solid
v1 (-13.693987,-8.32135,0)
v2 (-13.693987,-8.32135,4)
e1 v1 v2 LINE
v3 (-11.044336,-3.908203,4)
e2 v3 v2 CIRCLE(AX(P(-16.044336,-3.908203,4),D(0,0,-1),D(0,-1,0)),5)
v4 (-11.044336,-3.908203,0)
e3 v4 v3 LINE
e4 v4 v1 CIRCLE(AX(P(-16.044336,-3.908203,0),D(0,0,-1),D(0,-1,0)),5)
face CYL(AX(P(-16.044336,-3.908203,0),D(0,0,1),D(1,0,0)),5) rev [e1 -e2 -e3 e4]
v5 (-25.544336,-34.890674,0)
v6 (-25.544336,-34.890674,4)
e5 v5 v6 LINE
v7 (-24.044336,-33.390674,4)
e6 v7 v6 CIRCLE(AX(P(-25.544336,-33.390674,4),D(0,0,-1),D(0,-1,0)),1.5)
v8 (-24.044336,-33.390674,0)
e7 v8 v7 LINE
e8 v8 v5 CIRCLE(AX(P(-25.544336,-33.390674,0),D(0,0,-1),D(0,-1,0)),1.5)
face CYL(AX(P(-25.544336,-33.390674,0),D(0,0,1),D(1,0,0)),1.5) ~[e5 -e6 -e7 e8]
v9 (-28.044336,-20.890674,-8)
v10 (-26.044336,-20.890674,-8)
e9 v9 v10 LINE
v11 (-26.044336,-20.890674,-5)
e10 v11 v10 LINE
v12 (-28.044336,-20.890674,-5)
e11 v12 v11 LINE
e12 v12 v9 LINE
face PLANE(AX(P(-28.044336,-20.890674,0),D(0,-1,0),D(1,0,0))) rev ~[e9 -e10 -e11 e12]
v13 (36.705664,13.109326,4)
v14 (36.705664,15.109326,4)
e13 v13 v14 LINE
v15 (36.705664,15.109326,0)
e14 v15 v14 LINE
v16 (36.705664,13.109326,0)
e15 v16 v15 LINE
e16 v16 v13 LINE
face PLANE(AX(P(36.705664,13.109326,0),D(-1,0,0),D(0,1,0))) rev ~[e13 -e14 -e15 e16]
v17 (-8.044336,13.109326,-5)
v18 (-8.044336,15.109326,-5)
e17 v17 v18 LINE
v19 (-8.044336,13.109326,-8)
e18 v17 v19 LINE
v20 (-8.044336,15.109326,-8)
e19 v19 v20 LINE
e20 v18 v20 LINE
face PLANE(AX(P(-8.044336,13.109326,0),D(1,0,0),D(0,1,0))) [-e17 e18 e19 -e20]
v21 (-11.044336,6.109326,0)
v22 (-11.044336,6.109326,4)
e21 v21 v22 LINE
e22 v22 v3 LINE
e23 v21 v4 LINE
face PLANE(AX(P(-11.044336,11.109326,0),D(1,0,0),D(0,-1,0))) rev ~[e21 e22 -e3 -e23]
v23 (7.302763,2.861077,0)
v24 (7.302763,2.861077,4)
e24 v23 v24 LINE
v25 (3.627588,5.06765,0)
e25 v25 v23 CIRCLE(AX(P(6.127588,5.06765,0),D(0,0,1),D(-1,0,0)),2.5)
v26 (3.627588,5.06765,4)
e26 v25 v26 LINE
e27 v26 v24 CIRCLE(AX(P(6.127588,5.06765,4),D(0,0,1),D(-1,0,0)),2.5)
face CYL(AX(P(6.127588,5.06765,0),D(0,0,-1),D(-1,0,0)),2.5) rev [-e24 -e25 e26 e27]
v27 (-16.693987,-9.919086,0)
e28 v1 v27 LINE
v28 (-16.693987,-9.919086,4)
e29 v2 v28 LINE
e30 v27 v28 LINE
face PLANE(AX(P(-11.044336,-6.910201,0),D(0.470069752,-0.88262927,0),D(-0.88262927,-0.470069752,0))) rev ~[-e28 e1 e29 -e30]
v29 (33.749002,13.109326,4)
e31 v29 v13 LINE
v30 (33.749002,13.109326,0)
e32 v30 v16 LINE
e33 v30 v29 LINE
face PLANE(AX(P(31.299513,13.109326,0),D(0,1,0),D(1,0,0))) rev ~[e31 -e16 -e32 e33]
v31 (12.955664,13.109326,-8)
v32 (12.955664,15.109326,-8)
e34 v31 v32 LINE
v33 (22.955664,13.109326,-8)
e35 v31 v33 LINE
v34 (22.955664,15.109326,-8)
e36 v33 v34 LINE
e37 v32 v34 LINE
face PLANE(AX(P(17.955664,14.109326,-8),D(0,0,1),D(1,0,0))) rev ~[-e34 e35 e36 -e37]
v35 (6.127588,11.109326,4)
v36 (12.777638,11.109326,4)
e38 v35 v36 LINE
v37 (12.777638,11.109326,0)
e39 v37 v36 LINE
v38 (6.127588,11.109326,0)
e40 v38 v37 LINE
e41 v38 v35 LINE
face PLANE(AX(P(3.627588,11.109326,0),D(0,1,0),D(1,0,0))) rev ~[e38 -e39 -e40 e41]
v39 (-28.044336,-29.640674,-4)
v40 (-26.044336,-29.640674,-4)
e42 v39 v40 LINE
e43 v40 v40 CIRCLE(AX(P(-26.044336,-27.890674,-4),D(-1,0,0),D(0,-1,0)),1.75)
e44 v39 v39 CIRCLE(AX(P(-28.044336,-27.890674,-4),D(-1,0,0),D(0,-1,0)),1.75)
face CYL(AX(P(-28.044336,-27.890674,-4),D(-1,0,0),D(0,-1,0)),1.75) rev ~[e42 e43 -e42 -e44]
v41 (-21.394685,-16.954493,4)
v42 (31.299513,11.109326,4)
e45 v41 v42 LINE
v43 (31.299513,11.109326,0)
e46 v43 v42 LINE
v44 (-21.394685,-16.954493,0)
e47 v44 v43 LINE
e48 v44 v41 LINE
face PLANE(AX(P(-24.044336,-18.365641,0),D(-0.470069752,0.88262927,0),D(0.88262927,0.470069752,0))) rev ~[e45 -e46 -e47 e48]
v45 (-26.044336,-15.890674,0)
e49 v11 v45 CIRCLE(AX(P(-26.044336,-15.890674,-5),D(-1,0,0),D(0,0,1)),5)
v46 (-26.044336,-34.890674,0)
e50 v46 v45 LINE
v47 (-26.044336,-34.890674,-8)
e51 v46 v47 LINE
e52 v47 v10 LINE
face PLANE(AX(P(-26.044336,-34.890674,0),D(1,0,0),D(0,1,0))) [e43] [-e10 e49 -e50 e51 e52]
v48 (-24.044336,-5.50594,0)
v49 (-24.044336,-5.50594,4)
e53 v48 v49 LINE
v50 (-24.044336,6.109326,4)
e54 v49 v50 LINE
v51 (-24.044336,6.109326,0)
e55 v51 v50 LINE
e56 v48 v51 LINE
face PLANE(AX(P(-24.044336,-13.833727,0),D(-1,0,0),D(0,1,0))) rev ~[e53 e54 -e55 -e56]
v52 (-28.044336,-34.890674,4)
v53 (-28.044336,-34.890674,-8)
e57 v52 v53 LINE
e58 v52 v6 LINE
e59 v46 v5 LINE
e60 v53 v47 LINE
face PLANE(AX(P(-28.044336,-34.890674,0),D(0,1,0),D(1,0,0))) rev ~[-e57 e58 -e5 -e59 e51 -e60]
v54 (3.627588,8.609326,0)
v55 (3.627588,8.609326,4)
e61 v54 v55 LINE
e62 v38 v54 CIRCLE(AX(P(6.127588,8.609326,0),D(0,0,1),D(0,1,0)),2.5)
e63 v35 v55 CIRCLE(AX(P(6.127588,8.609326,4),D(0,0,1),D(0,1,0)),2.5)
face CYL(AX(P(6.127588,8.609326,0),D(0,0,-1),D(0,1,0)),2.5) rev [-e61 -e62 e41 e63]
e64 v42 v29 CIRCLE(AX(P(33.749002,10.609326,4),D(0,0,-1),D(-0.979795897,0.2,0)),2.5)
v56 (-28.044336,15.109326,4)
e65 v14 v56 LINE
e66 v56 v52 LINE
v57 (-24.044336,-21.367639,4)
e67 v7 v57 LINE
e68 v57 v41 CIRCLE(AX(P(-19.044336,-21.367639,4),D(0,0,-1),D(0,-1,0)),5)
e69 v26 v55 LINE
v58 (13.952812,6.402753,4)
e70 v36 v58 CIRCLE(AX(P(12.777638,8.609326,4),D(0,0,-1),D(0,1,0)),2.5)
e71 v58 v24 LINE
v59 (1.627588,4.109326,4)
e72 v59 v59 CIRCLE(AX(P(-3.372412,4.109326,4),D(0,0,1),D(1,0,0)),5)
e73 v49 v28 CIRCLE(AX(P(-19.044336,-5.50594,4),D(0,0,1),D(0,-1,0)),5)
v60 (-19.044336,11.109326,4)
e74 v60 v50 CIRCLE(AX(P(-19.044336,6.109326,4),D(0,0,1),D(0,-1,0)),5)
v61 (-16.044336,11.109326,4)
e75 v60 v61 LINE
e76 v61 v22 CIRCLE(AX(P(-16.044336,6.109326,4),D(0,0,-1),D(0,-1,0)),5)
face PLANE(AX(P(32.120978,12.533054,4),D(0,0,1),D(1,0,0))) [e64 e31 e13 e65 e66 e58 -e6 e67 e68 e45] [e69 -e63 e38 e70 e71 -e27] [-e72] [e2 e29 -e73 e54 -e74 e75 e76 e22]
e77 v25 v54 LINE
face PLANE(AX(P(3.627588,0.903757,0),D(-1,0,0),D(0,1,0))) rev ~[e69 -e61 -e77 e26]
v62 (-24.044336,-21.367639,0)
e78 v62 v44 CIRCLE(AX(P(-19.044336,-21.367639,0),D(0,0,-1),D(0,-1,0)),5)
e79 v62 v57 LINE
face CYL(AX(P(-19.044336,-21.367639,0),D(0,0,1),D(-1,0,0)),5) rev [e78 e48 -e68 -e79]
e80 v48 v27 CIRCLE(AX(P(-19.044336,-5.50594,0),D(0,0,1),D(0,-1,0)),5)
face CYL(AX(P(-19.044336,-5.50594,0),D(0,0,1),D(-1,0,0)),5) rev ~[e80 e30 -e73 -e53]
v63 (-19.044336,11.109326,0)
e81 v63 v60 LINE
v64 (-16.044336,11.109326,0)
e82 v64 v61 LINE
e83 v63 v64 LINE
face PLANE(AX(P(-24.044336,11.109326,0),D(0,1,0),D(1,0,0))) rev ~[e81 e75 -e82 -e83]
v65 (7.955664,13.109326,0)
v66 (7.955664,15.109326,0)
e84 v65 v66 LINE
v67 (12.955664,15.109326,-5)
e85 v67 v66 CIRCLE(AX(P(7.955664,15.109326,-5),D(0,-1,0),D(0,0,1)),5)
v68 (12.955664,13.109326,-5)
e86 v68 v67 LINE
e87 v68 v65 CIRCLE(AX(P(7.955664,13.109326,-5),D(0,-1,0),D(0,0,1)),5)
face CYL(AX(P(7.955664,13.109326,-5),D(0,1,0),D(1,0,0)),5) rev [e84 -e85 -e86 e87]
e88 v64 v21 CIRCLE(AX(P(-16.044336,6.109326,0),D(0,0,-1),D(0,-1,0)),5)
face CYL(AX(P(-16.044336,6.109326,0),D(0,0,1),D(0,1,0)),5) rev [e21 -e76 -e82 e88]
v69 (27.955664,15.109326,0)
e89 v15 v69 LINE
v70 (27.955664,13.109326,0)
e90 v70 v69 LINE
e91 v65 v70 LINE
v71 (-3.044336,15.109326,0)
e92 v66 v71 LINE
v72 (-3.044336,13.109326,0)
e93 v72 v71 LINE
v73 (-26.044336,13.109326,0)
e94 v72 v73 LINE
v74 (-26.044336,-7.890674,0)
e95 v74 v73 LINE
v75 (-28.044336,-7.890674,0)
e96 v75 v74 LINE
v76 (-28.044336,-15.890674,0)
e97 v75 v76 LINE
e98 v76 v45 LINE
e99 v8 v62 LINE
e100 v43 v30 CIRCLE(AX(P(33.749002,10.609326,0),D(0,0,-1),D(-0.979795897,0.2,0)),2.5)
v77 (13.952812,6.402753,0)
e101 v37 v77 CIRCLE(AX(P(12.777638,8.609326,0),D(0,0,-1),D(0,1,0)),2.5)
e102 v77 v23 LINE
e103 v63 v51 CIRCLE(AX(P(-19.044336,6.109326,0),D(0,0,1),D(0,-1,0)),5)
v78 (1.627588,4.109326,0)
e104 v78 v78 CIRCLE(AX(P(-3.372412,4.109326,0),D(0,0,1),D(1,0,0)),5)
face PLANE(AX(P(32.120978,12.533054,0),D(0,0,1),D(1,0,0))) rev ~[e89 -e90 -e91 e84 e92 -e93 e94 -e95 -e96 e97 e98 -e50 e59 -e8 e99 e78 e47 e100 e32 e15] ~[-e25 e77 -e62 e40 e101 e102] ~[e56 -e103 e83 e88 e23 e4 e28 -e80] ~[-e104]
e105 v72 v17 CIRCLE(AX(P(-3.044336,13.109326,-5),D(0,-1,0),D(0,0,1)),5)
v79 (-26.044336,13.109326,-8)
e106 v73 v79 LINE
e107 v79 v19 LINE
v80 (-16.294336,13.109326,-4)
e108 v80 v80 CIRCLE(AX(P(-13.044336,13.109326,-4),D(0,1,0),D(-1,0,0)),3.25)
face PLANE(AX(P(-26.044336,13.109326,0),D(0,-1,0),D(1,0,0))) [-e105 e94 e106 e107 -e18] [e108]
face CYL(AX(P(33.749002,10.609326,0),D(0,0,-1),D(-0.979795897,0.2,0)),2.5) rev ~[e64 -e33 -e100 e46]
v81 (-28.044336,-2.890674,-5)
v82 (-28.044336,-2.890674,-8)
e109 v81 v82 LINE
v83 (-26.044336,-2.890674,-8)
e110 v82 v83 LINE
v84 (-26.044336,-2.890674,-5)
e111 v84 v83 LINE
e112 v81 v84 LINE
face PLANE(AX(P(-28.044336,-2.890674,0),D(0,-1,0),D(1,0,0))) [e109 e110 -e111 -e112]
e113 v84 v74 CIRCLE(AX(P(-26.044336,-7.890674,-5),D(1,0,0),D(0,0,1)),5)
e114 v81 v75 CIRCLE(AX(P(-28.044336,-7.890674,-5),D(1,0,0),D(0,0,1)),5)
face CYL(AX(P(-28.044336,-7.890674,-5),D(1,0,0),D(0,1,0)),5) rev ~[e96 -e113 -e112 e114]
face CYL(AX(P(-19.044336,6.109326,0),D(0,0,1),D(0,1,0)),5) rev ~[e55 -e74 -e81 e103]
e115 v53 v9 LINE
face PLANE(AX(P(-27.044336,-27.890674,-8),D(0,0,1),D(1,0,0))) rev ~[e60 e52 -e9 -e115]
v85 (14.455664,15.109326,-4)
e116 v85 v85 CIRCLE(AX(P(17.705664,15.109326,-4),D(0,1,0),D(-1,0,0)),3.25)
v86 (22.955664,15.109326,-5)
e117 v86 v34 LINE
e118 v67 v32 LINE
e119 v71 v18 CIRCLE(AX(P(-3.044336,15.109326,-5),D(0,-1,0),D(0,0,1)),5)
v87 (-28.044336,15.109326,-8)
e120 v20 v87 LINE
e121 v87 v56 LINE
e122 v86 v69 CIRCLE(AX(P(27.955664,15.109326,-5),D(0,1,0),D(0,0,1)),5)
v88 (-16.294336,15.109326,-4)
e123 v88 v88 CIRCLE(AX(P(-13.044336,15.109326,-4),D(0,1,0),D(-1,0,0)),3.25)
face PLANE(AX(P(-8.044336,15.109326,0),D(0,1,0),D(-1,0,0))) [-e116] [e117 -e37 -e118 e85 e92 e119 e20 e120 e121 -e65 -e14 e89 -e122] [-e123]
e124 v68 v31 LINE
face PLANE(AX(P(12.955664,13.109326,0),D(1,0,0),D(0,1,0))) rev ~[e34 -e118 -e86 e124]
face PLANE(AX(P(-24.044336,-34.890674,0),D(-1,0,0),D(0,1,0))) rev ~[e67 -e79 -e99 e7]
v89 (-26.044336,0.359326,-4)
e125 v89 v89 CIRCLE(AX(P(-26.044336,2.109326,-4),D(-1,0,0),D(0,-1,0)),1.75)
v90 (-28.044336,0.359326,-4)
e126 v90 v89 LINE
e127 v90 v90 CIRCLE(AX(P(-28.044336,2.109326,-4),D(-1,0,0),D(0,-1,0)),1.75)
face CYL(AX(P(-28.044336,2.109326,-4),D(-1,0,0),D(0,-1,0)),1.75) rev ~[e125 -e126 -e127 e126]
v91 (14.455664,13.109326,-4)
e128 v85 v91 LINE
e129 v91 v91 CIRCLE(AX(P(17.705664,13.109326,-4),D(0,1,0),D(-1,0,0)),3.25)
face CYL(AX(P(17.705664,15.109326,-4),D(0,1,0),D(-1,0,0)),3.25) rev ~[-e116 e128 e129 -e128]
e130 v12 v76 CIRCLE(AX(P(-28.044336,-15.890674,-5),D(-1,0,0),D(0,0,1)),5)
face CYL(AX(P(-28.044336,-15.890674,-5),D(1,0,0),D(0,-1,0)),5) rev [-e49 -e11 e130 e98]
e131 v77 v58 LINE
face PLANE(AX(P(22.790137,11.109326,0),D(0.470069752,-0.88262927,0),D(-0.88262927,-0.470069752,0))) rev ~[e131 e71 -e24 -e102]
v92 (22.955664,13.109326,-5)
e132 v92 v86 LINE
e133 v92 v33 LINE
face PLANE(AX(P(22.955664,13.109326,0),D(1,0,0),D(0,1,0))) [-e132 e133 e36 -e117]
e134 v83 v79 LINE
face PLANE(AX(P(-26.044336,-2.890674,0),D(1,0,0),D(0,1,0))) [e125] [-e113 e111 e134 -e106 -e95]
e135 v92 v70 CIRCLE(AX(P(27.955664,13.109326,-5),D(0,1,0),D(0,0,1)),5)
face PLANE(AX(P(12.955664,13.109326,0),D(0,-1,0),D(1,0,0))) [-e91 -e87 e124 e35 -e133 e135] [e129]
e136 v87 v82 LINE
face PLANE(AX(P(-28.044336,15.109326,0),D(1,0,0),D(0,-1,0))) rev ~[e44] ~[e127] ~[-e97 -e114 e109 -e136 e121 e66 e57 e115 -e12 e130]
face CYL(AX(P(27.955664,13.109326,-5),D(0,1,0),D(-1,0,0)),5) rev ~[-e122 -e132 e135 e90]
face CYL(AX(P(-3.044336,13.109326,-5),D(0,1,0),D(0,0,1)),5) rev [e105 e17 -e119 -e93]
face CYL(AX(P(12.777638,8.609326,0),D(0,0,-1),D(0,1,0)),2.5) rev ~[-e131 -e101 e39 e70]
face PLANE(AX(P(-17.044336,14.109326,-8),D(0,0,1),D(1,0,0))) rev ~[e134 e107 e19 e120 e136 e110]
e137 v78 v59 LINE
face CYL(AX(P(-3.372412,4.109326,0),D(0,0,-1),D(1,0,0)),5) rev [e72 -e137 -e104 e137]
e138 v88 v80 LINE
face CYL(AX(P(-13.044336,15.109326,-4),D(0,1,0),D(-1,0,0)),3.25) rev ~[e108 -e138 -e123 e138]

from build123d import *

# Parameters (mm, degrees)
F0_R        = 5
F1_DEPTH    = 4
F2_W        = 10
F2_H        = 2
F2_W_2      = 18
F2_W_3      = 2
F2_H_2      = 14
F3_DEPTH    = 8
F4_R        = 5
F5_T1_DEPTH = 4
F6_R        = 1.5
F8_R        = 3.25
F9_DEPTH    = 2
F7_R        = 1.75
F10_DEPTH   = 2


# Not quite as in the source:
# - a fillet or chamfer that OpenCascade refuses, or shapes differently, is made with other operations: its cross-section is extruded or revolved along the edge and cut away or added


with BuildPart() as f1:
    # F0 (on Top) → F1 (new body)
    with BuildSketch(Plane.XY):
        Polygon((-24.0443362383, -18.3656413368), (31.299512524, 11.1093264446), (31.299512524, 13.1093264446), (36.7056637617, 13.1093264446), (36.7056637617, 15.1093264446), (-28.0443362383, 15.1093264446), (-28.0443362383, -34.8906735554), (-24.0443362383, -34.8906735554), align=None)
        Polygon((-24.0443362383, -13.8337272738), (-24.0443362383, 11.1093264446), (-11.0443362383, 11.1093264446), (3.6275881428, 11.1093264446), (22.7901370984, 11.1093264446), (3.6275881428, 0.9037566169), (-11.0443362383, -6.9102011778), align=None, mode=Mode.SUBTRACT)
        Polygon((3.6275881428, 11.1093264446), (-11.0443362383, 11.1093264446), (-11.0443362383, -6.9102011778), (3.6275881428, 0.9037566169), align=None)
        with Locations((-3.3724118572, 4.1093264446)):
            Circle(F0_R, mode=Mode.SUBTRACT)
    extrude(amount=F1_DEPTH)

    # F2 (on Top) → F3 (join)
    with BuildSketch(Plane.XY):
        with Locations((17.9556637617, 14.1093264446)):
            Rectangle(F2_W, F2_H)
        with Locations((-17.0443362383, 14.1093264446)):
            Rectangle(F2_W_2, F2_H)
        Polygon((-26.0443362383, 15.1093264446), (-28.0443362383, 15.1093264446), (-28.0443362383, -2.8906735554), (-26.0443362383, -2.8906735554), (-26.0443362383, 13.1093264446), align=None)
        with Locations((-27.0443362383, -27.8906735554)):
            Rectangle(F2_W_3, F2_H_2)
    extrude(amount=-F3_DEPTH)

    # F4
    f4_edges = [f1.edges().sort_by_distance(p)[0] for p in [
        (-24.044336, -18.365641, 2),
        (-24.044336, 11.109326, 2),
        (-8.044336, 14.109326, 0),
        (22.955664, 14.109326, 0),
        (-27.044336, -2.890674, 0),
        (12.955664, 14.109326, 0),
        (-27.044336, -20.890674, 0),
        (-11.044336, -6.910201, 2),
        (-24.044336, -13.833727, 2),
        (-11.044336, 11.109326, 2),
    ]]
    fillet(f4_edges, radius=F4_R)

    # F5: fillet of radius 2.5 on 4 edges, made by hand

    # F5_s2 → F5_t1 (join)
    with BuildSketch(Plane.XY):
        with BuildLine():
            ThreePointArc((31.299512524, 11.1093264446), (32.1678634367, 12.5458181177), (33.7490022668, 13.1093264446))
            Line((33.7490022668, 13.1093264446), (31.299512524, 13.1093264446))
            Line((31.299512524, 13.1093264446), (31.299512524, 11.1093264446))
        make_face()
        with BuildLine():
            ThreePointArc((12.7776375713, 11.1093264446), (15.2031718358, 9.2149530062), (13.9528119525, 6.4027532703))
            Line((13.9528119525, 6.4027532703), (22.7901370984, 11.1093264446))
            Line((22.7901370984, 11.1093264446), (12.7776375713, 11.1093264446))
        make_face()
        with BuildLine():
            ThreePointArc((3.6275881428, 5.0676502325), (4.840719065, 2.9242958576), (7.302762524, 2.8610770581))
            Line((7.302762524, 2.8610770581), (3.6275881428, 0.9037566169))
            Line((3.6275881428, 0.9037566169), (3.6275881428, 5.0676502325))
        make_face()
        with BuildLine():
            ThreePointArc((6.1275881428, 11.1093264446), (4.3598211899, 10.3770933976), (3.6275881428, 8.6093264446))
            Line((3.6275881428, 8.6093264446), (3.6275881428, 11.1093264446))
            Line((3.6275881428, 11.1093264446), (6.1275881428, 11.1093264446))
        make_face()
    extrude(amount=F5_T1_DEPTH)

    # F6
    f6_edges = [f1.edges().sort_by_distance(p)[0] for p in [
        (-24.044336, -34.890674, 2),
    ]]
    fillet(f6_edges, radius=F6_R)

    # F8 (on face) → F9 (cut)
    with BuildSketch(Plane(origin=(0, 15.1093264446, 0), x_dir=(-1, 0, 0), z_dir=(0, 1, 0))):
        with Locations((-17.7056637617, -4)):
            Circle(F8_R)
        with Locations((13.0443362383, -4)):
            Circle(F8_R)
    extrude(amount=-F9_DEPTH, mode=Mode.SUBTRACT)

    # F7 (on face) → F10 (cut)
    with BuildSketch(Plane(origin=(-28.0443362383, 0, 0), x_dir=(0, -1, 0), z_dir=(-1, 0, 0))):
        with Locations((27.8906735554, -4)):
            Circle(F7_R)
        with Locations((-2.1093264446, -4)):
            Circle(F7_R)
    extrude(amount=-F10_DEPTH, mode=Mode.SUBTRACT)


solid = f1.part
